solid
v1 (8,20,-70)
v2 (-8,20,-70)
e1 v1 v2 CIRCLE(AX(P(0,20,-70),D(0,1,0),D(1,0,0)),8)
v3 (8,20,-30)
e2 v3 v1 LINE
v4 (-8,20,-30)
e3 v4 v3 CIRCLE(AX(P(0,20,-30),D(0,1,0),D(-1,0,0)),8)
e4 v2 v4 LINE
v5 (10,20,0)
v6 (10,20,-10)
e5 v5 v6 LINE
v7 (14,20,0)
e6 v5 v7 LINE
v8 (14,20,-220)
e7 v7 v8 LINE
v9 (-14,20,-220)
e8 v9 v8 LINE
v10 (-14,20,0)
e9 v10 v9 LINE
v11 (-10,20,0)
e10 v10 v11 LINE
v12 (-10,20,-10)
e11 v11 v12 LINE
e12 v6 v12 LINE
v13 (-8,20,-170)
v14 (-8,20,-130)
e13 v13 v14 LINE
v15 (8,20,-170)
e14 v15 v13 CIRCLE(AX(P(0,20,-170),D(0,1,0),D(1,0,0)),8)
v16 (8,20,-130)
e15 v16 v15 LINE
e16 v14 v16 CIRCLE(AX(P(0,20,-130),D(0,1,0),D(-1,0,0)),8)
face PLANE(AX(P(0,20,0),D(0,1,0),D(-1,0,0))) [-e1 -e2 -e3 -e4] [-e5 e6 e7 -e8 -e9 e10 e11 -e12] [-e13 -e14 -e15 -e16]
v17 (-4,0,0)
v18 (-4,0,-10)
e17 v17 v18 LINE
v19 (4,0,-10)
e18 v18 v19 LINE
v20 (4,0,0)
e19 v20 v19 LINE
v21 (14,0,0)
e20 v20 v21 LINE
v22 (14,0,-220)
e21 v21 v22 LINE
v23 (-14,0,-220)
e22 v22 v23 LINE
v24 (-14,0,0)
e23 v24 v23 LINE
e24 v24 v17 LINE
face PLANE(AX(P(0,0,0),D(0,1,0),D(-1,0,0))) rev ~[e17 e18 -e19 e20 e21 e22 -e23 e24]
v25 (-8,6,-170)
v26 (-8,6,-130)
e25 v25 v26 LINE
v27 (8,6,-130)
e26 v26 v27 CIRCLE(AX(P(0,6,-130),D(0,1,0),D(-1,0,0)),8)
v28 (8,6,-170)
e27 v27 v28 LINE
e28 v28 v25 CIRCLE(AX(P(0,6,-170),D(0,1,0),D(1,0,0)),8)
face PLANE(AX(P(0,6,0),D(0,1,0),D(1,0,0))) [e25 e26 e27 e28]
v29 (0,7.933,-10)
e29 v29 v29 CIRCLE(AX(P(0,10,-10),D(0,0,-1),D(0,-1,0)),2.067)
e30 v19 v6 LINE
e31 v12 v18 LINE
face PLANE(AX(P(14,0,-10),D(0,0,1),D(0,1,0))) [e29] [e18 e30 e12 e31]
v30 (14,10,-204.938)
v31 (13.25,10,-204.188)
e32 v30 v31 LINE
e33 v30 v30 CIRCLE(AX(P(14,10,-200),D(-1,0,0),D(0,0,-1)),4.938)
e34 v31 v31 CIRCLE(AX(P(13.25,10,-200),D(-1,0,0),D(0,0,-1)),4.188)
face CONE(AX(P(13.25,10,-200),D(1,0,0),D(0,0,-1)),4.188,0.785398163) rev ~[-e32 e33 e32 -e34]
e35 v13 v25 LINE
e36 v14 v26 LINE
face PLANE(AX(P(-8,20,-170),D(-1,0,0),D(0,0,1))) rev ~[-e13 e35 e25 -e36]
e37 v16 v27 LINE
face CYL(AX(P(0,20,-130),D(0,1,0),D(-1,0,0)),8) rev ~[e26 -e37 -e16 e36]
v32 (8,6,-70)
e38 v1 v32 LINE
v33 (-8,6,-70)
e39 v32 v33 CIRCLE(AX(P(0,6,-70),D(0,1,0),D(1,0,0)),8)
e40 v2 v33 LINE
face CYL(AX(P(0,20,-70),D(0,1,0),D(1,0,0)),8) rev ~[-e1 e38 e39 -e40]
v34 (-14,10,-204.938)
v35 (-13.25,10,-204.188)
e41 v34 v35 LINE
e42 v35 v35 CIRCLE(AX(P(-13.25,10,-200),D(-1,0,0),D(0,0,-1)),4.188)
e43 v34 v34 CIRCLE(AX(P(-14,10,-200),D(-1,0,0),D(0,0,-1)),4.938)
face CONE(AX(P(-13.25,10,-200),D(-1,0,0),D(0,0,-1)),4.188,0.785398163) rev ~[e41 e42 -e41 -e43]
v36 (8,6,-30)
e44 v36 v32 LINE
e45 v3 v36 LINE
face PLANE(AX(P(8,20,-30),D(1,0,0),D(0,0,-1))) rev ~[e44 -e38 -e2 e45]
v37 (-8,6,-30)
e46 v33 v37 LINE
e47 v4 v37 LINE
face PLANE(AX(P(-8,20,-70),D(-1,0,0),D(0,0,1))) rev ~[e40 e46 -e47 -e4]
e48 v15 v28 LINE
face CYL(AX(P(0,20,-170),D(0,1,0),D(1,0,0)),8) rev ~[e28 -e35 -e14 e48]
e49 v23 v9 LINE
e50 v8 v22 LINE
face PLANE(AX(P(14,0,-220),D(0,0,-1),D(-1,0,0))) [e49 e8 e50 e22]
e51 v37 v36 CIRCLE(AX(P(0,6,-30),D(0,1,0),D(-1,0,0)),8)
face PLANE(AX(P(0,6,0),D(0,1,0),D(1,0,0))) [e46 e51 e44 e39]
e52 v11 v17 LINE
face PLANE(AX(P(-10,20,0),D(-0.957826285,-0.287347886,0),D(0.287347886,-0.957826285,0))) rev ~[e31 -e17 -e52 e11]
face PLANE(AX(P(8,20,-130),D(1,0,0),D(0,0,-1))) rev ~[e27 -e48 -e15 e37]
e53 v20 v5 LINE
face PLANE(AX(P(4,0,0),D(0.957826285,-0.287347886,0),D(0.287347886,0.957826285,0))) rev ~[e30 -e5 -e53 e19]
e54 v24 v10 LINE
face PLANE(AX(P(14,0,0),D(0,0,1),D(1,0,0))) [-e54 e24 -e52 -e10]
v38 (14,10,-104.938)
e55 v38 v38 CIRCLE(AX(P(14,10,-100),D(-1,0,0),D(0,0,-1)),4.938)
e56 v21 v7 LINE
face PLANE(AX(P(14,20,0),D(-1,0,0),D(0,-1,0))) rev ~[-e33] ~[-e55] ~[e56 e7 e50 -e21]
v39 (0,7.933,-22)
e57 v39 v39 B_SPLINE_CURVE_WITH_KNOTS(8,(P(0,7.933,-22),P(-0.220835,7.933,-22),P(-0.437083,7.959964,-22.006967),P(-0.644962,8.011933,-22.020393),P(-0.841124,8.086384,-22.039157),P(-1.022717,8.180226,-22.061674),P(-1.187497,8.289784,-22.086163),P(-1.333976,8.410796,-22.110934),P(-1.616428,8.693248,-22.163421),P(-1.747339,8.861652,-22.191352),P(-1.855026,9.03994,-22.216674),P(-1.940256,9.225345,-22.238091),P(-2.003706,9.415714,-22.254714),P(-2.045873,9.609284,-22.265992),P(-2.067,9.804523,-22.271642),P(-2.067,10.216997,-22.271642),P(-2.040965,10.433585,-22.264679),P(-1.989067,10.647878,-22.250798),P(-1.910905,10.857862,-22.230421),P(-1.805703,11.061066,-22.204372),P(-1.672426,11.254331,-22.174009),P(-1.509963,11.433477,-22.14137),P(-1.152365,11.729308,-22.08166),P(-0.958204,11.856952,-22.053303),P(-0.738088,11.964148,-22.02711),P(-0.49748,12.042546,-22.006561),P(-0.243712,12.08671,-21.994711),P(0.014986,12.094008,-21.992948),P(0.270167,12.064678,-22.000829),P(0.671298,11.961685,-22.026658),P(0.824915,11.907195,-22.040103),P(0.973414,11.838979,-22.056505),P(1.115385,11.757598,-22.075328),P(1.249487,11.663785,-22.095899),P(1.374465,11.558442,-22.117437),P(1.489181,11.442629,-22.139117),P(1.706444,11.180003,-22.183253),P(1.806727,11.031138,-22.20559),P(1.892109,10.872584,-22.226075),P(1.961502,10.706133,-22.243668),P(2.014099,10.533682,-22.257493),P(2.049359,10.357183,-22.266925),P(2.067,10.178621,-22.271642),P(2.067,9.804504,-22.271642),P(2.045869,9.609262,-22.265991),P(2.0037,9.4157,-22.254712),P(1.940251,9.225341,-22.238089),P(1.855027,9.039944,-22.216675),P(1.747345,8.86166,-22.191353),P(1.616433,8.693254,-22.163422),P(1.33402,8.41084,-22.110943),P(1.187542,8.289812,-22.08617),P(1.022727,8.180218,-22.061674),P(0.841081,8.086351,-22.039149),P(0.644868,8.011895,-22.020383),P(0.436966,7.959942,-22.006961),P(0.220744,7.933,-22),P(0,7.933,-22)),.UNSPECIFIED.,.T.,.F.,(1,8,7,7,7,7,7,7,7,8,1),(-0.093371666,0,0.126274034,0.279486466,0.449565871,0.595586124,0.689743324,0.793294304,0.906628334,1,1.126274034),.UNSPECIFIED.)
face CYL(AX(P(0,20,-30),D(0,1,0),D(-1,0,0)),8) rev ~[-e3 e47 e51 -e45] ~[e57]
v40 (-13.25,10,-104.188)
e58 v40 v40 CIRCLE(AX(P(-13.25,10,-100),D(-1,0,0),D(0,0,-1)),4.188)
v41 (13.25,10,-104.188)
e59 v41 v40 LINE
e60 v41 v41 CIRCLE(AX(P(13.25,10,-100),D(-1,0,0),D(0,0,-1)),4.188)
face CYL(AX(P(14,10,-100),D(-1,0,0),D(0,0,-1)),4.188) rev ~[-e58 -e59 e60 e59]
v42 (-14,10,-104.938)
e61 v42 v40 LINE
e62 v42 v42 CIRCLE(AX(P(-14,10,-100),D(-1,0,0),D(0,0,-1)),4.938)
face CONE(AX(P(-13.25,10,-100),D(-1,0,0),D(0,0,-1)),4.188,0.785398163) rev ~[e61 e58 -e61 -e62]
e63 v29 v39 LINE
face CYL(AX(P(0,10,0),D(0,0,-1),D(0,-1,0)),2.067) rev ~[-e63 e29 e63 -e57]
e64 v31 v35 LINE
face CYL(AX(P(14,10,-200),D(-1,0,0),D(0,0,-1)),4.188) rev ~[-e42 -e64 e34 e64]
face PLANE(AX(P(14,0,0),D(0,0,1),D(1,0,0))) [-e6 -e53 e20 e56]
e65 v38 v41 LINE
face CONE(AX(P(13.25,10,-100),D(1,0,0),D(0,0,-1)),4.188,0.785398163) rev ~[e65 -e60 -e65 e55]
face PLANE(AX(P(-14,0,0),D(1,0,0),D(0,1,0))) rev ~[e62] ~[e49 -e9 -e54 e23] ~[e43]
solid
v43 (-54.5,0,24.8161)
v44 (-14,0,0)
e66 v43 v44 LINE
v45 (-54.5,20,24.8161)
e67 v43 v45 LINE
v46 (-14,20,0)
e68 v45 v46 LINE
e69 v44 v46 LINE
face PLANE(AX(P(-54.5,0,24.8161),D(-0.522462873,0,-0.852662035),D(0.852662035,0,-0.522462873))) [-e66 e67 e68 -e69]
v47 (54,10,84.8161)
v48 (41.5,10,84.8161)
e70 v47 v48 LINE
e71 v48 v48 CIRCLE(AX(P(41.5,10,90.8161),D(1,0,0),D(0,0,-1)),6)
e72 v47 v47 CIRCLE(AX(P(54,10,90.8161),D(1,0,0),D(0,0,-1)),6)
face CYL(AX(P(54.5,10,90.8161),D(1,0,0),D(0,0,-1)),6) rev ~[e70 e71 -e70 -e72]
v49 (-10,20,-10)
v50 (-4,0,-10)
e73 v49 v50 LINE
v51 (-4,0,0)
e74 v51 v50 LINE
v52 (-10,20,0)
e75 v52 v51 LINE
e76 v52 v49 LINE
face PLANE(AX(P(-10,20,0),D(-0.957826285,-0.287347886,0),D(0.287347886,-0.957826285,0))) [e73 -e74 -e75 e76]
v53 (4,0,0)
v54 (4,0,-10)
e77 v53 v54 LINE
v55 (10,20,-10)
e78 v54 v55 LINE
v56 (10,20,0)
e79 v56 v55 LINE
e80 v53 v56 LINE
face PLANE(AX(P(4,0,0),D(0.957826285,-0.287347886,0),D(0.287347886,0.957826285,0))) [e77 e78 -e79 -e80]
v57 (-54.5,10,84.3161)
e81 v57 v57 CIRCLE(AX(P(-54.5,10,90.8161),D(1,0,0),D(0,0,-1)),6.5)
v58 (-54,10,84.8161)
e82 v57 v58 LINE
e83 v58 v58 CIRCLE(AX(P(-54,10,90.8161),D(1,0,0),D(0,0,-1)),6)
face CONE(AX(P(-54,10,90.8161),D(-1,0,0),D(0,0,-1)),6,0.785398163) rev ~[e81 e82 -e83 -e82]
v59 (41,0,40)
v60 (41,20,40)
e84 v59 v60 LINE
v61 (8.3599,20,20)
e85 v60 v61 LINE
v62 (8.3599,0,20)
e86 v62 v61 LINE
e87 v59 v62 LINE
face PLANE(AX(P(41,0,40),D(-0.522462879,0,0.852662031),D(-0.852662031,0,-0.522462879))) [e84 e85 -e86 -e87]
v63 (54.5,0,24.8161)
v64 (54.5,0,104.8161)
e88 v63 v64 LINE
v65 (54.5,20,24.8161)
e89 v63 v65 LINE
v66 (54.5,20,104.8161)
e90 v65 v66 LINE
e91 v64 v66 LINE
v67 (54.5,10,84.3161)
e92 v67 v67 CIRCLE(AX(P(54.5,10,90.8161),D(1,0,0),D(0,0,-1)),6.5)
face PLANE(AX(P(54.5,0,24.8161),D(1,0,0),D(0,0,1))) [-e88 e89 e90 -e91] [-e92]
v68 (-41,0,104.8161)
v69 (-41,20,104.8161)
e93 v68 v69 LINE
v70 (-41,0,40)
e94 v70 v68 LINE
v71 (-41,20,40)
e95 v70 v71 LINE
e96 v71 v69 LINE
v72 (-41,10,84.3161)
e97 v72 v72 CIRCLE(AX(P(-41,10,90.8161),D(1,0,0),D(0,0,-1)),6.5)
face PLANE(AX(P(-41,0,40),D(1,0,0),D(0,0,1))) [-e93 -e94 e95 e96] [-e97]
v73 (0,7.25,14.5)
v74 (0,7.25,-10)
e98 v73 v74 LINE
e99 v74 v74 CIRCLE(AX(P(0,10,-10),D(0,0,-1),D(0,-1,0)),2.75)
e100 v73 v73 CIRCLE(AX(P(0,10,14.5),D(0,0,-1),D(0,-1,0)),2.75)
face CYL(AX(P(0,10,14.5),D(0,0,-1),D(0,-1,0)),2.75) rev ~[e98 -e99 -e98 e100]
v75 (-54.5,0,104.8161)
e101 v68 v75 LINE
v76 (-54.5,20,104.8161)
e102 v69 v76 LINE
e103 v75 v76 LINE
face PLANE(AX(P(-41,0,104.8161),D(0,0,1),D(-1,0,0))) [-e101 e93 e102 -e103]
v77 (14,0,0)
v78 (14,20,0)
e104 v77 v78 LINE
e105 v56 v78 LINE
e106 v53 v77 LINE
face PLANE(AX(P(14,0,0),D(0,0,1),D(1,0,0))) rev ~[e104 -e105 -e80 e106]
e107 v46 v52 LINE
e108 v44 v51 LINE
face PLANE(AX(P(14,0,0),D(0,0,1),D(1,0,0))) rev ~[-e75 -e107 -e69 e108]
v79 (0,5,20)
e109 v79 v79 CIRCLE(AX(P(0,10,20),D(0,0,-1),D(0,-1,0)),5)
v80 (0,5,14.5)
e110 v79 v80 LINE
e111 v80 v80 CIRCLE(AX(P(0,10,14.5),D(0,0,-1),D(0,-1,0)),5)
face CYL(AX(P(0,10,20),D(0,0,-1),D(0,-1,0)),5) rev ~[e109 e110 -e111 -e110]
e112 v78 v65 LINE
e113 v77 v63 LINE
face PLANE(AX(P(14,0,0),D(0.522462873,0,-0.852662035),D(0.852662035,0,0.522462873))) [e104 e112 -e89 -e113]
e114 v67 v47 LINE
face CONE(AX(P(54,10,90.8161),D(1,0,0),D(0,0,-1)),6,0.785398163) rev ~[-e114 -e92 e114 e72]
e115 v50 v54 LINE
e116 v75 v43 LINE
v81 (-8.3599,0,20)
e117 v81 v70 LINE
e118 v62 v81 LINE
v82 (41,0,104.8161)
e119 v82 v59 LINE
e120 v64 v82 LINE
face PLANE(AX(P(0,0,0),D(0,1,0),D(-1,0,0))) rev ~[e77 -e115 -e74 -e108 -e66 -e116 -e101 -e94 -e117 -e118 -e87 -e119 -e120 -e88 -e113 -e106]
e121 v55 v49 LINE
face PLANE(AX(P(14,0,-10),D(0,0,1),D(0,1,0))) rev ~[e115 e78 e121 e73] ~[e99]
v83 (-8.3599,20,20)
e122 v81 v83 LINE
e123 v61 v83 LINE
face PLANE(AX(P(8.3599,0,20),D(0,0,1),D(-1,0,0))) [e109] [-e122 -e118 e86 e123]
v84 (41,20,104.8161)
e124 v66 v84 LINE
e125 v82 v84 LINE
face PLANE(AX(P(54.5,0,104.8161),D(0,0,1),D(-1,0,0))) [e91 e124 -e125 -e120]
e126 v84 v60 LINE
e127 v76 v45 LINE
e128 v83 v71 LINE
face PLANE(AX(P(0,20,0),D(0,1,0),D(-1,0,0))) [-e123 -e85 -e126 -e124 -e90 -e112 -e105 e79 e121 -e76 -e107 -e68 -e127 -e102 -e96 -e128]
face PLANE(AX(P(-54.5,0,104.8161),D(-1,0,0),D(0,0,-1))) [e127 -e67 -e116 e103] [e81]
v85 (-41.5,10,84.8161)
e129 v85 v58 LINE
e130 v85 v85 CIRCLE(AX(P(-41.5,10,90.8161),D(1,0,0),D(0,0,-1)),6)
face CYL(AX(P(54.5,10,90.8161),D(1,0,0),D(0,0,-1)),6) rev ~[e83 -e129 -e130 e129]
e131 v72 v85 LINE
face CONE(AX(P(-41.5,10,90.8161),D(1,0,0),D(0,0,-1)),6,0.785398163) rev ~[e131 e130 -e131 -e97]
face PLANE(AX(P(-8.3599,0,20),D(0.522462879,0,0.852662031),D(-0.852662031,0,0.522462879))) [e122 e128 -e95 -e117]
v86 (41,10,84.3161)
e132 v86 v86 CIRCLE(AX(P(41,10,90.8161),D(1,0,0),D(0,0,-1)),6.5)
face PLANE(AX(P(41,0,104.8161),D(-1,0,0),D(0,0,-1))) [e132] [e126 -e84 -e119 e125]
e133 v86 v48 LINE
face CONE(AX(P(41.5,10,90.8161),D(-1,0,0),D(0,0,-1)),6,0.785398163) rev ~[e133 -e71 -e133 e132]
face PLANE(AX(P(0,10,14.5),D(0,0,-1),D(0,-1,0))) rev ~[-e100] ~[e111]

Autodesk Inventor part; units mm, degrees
sketch "Skizze1" plane through (0, 0, 0) normal (0, 1, 0) x (-1, 0, 0)
  line L0 (54.5, 104.8161) -> (54.5, 24.8161)
  line L1 (54.5, 24.8161) -> (14, 0)
  line L2 (14, 0) -> (-14, 0)
  line L3 (-14, 0) -> (-54.5, 24.8161)
  line L4 (-54.5, 24.8161) -> (-54.5, 104.8161)
  line L5 (-54.5, 104.8161) -> (-41, 104.8161)
  line L6 (-41, 104.8161) -> (-41, 40)
  line L7 (-41, 40) -> (-8.3599, 20)
  line L8 (-8.3599, 20) -> (8.3599, 20)
  line L9 (8.3599, 20) -> (41, 40)
  line L10 (41, 40) -> (41, 104.8161)
  line L11 (41, 104.8161) -> (54.5, 104.8161)
  line L12 (0, -284.9632) -> (0, 169.7793) construction
  line L13 (41, 40) -> (54.5, 40) construction
  point P0 (0, 0)
  point P1 (0, 20)
  dimension "d0" = 82
  dimension "d1" = 13.5
  dimension "d2" = 13.5
  dimension "d113" = 28
  dimension "d114" = 20
  dimension "d115" = 80
  dimension "d117" = 20
  dimension "d118" = 20
extrude "Extrusion1" add sketch "Skizze1" along normal blind 20
sketch "Skizze2" plane through (14, 0, 0) normal (0, 0, -1) x (-1, 0, 0)
  line L0 (55, 20) -> (22.3599, 20) construction
  line L1 (0, 0) -> (28, 0)
  line L2 (28, 0) -> (28, 20)
  line L3 (28, 20) -> (0, 20)
  line L4 (0, 20) -> (0, 0)
  line L5 (14, -4) -> (14, 24) construction
  line L6 (0, 0) -> (28, 0) construction
  point P0 (14, 0)
  point P1 (14, 0)
  point P2 (14, 20)
  dimension "d75" = 28
extrude "Extrusion2" add sketch "Skizze2" along normal blind 220
ref_plane "Arbeitsebene1" through (53.5, 2, 88) normal (1, 0, 0) x (0, 0, -1)
sketch "Skizze3" plane through (54.5, 0, 104.8161) normal (1, 0, 0) x (0, 0, -1)
  line L0 (0, 10) -> (14, 10) construction
  line L1 (0, 0) -> (0, 20) construction
  circle A0 centre (14, 10) radius 6
  dimension "d44" = 14
  dimension "d87" = 12
extrude "Extrusion3" cut sketch "Skizze3" against normal through all
ref_plane "Arbeitsebene5" through (14, 0, -200) normal (0, 0, -1) x (-1, 0, 0)
ref_plane "Arbeitsebene6" through (14, 0, -100) normal (0, 0, -1) x (-1, 0, 0)
ref_plane "Arbeitsebene7" through (14, 0, -150) normal (0, 0, -1) x (-1, 0, 0)
sketch "Skizze13" plane through (14, 0, 104.8161) normal (1, 0, 0) x (0, 0, -1)
  line L0 (304.8161, 24) -> (304.8161, -4) construction
  line L1 (204.8161, 24) -> (204.8161, -4) construction
  line L2 (324.8161, 0) -> (324.8161, 20) construction
  line L3 (324.8161, 10) -> (204.8161, 10) construction
  point P0 (104.8161, 0)
  point P1 (304.8161, 10)
hole "Bohrung2" at (14, 10, -100) at (14, 10, -200) direction (-1, 0, 0) diameter 8.376 end through all thread size "M10x1.5" class "6H" standard "ISO Metric profile"
sketch "Skizze12" plane through (14, 0, -220) normal (0, 0, -1) x (-1, 0, 0)
  line L0 (28, 20) -> (0, 20) construction
  point P0 (14, 0)
  dimension "Gabel_FixierungPart_Width" = 28
chamfer "Fase1" distance 0.75 angle 45 4 edges at (14, 10, -95.812) (14, 10, -195.812) (-14, 10, -195.812) (-14, 10, -95.812)
chamfer "Fase2" distance 0.5 angle 45 4 edges at (54.5, 10, 96.8161) (41, 10, 96.8161) (-54.5, 10, 96.8161) (-41, 10, 96.8161)
sketch "Skizze15" plane through (0, 20, 0) normal (0, 1, 0) x (1, 0, 0)
  line L0 (-76.3, 100) -> (76.3, 100) construction
  line L1 (0, 30) -> (0, 70) construction
  line L2 (8, 30) -> (8, 70)
  line L3 (-8, 70) -> (-8, 30)
  arc A0 (-8, 30) -> (8, 30) centre (0, 30) ccw
  arc A1 (8, 70) -> (-8, 70) centre (0, 70) ccw
  line L4 (-14, 0) -> (-14, 220) construction
  line L5 (14, 0) -> (14, 220) construction
  line L6 (-14, 100) -> (14, 100) construction
  line L7 (-14, 100) -> (14, 100) construction
  line L8 (-76.3, 200) -> (76.3, 200) construction
  line L9 (-14, 200) -> (14, 200) construction
  line L10 (0, 130) -> (0, 170) construction
  line L11 (8, 130) -> (8, 170)
  line L12 (-8, 170) -> (-8, 130)
  arc A2 (-8, 130) -> (8, 130) centre (0, 130) ccw
  arc A3 (8, 170) -> (-8, 170) centre (0, 170) ccw
  line L13 (0, 264) -> (0, -44) construction
  point P0 (0, 0)
  point P1 (0, 50)
  point P2 (0, 100)
  point P3 (0, 100)
  point P4 (0, 150)
  point P5 (0, 200)
  dimension "d124" = 0
  dimension "d125" = 100
  dimension "d126" = 50
  dimension "d127" = 40
  dimension "d130" = 0
  dimension "d131" = 0
  dimension "d133" = 40
  dimension "d134" = 100
  dimension "d135" = 50
  dimension "d156" = 16
  dimension "d157" = 16
extrude "Extrusion13" cut sketch "Skizze15" against normal blind 14
ref_plane "Arbeitsebene8" through (0, 0, 0) normal (1, 0, 0) x (0, 0, -1)
ref_plane "Arbeitsebene9" through (14, 0, 0) normal (0, 0, 1) x (0, 1, 0)
split body "Trennen1" result two bodies by plane through (14, 0, 0) normal (0, 0, 1) first body at (-50, 0.5, 56.5441)
sketch "Skizze16" plane through (14, 0, 0) normal (0, 0, 1) x (0, 1, 0)
  line L0 (0, 0) -> (20, 0) construction
  line L1 (0, 0) -> (0, 28) construction
  line L2 (0, 28) -> (20, 28) construction
  line L3 (20, 28) -> (20, 0) construction
  line L4 (20, 4) -> (20, 24)
  line L5 (20, 24) -> (0, 18)
  line L6 (0, 18) -> (0, 10)
  line L7 (0, 10) -> (20, 4)
  line L8 (0, 14) -> (20, 14) construction
  point P0 (0, 14)
  point P1 (10, 14)
  dimension "d136" = 20
  dimension "d137" = 8
extrude "Extrusion14" add sketch "Skizze16" against normal blind 10 bodies 2
extrude "Extrusion15" cut sketch "Skizze16" against normal blind 10 bodies 3
sketch "Skizze17" plane through (-8.3599, 0, 20) normal (0, 0, 1) x (1, 0, 0)
  point P0 (8.3599, 0)
  point P1 (8.3599, 10)
hole "Bohrung3" at (0, 10, 20) direction (0, 0, -1) diameter 5.5 depth 30 counterbore diameter 10 counterbore depth 5.5 bodies 2 clearance for "Inbusschraube DIN EN ISO 4762" size "M5" standard "DIN"
sketch "Skizze18" plane through (14, 0, -10) normal (0, 0, 1) x (1, 0, 0)
  point P0 (-14, 0)
  point P1 (-14, 10)
hole "Bohrung4" at (0, 10, 0) direction (0, 0, -1) diameter 4.134 end up to surface bodies 3 thread size "M5x0.8" class "6H" standard "ISO Metric profile"
equation "\"d1\" = d2"
equation "\"d113\" = -2 * Gabel_FixationShaft_Contact_Thickness + MainAxis_Schluesselweite + 2 * ParallelMecha_Bearing_Step_Thickness - 2 * Anlaufscheibe_Ueberstand"
equation "\"d75\" = -2 * Gabel_FixationShaft_Contact_Thickness + MainAxis_Schluesselweite + 2 * ParallelMecha_Bearing_Step_Thickness - 2 * Anlaufscheibe_Ueberstand"
equation "\"ParallelMecha_Bearing_Step_Thickness\" = 6"
equation "\"Anlaufscheibe_Ueberstand\" = 0.5"
equation "\"Gabel_FixationShaft_Contact_Thickness\" = 3.5"
equation "\"MainAxis_Schluesselweite\" = 24"
properties part number "Adaptationhorizontalachse_Rillenkugellager" material "PBT-Kunststoff"
